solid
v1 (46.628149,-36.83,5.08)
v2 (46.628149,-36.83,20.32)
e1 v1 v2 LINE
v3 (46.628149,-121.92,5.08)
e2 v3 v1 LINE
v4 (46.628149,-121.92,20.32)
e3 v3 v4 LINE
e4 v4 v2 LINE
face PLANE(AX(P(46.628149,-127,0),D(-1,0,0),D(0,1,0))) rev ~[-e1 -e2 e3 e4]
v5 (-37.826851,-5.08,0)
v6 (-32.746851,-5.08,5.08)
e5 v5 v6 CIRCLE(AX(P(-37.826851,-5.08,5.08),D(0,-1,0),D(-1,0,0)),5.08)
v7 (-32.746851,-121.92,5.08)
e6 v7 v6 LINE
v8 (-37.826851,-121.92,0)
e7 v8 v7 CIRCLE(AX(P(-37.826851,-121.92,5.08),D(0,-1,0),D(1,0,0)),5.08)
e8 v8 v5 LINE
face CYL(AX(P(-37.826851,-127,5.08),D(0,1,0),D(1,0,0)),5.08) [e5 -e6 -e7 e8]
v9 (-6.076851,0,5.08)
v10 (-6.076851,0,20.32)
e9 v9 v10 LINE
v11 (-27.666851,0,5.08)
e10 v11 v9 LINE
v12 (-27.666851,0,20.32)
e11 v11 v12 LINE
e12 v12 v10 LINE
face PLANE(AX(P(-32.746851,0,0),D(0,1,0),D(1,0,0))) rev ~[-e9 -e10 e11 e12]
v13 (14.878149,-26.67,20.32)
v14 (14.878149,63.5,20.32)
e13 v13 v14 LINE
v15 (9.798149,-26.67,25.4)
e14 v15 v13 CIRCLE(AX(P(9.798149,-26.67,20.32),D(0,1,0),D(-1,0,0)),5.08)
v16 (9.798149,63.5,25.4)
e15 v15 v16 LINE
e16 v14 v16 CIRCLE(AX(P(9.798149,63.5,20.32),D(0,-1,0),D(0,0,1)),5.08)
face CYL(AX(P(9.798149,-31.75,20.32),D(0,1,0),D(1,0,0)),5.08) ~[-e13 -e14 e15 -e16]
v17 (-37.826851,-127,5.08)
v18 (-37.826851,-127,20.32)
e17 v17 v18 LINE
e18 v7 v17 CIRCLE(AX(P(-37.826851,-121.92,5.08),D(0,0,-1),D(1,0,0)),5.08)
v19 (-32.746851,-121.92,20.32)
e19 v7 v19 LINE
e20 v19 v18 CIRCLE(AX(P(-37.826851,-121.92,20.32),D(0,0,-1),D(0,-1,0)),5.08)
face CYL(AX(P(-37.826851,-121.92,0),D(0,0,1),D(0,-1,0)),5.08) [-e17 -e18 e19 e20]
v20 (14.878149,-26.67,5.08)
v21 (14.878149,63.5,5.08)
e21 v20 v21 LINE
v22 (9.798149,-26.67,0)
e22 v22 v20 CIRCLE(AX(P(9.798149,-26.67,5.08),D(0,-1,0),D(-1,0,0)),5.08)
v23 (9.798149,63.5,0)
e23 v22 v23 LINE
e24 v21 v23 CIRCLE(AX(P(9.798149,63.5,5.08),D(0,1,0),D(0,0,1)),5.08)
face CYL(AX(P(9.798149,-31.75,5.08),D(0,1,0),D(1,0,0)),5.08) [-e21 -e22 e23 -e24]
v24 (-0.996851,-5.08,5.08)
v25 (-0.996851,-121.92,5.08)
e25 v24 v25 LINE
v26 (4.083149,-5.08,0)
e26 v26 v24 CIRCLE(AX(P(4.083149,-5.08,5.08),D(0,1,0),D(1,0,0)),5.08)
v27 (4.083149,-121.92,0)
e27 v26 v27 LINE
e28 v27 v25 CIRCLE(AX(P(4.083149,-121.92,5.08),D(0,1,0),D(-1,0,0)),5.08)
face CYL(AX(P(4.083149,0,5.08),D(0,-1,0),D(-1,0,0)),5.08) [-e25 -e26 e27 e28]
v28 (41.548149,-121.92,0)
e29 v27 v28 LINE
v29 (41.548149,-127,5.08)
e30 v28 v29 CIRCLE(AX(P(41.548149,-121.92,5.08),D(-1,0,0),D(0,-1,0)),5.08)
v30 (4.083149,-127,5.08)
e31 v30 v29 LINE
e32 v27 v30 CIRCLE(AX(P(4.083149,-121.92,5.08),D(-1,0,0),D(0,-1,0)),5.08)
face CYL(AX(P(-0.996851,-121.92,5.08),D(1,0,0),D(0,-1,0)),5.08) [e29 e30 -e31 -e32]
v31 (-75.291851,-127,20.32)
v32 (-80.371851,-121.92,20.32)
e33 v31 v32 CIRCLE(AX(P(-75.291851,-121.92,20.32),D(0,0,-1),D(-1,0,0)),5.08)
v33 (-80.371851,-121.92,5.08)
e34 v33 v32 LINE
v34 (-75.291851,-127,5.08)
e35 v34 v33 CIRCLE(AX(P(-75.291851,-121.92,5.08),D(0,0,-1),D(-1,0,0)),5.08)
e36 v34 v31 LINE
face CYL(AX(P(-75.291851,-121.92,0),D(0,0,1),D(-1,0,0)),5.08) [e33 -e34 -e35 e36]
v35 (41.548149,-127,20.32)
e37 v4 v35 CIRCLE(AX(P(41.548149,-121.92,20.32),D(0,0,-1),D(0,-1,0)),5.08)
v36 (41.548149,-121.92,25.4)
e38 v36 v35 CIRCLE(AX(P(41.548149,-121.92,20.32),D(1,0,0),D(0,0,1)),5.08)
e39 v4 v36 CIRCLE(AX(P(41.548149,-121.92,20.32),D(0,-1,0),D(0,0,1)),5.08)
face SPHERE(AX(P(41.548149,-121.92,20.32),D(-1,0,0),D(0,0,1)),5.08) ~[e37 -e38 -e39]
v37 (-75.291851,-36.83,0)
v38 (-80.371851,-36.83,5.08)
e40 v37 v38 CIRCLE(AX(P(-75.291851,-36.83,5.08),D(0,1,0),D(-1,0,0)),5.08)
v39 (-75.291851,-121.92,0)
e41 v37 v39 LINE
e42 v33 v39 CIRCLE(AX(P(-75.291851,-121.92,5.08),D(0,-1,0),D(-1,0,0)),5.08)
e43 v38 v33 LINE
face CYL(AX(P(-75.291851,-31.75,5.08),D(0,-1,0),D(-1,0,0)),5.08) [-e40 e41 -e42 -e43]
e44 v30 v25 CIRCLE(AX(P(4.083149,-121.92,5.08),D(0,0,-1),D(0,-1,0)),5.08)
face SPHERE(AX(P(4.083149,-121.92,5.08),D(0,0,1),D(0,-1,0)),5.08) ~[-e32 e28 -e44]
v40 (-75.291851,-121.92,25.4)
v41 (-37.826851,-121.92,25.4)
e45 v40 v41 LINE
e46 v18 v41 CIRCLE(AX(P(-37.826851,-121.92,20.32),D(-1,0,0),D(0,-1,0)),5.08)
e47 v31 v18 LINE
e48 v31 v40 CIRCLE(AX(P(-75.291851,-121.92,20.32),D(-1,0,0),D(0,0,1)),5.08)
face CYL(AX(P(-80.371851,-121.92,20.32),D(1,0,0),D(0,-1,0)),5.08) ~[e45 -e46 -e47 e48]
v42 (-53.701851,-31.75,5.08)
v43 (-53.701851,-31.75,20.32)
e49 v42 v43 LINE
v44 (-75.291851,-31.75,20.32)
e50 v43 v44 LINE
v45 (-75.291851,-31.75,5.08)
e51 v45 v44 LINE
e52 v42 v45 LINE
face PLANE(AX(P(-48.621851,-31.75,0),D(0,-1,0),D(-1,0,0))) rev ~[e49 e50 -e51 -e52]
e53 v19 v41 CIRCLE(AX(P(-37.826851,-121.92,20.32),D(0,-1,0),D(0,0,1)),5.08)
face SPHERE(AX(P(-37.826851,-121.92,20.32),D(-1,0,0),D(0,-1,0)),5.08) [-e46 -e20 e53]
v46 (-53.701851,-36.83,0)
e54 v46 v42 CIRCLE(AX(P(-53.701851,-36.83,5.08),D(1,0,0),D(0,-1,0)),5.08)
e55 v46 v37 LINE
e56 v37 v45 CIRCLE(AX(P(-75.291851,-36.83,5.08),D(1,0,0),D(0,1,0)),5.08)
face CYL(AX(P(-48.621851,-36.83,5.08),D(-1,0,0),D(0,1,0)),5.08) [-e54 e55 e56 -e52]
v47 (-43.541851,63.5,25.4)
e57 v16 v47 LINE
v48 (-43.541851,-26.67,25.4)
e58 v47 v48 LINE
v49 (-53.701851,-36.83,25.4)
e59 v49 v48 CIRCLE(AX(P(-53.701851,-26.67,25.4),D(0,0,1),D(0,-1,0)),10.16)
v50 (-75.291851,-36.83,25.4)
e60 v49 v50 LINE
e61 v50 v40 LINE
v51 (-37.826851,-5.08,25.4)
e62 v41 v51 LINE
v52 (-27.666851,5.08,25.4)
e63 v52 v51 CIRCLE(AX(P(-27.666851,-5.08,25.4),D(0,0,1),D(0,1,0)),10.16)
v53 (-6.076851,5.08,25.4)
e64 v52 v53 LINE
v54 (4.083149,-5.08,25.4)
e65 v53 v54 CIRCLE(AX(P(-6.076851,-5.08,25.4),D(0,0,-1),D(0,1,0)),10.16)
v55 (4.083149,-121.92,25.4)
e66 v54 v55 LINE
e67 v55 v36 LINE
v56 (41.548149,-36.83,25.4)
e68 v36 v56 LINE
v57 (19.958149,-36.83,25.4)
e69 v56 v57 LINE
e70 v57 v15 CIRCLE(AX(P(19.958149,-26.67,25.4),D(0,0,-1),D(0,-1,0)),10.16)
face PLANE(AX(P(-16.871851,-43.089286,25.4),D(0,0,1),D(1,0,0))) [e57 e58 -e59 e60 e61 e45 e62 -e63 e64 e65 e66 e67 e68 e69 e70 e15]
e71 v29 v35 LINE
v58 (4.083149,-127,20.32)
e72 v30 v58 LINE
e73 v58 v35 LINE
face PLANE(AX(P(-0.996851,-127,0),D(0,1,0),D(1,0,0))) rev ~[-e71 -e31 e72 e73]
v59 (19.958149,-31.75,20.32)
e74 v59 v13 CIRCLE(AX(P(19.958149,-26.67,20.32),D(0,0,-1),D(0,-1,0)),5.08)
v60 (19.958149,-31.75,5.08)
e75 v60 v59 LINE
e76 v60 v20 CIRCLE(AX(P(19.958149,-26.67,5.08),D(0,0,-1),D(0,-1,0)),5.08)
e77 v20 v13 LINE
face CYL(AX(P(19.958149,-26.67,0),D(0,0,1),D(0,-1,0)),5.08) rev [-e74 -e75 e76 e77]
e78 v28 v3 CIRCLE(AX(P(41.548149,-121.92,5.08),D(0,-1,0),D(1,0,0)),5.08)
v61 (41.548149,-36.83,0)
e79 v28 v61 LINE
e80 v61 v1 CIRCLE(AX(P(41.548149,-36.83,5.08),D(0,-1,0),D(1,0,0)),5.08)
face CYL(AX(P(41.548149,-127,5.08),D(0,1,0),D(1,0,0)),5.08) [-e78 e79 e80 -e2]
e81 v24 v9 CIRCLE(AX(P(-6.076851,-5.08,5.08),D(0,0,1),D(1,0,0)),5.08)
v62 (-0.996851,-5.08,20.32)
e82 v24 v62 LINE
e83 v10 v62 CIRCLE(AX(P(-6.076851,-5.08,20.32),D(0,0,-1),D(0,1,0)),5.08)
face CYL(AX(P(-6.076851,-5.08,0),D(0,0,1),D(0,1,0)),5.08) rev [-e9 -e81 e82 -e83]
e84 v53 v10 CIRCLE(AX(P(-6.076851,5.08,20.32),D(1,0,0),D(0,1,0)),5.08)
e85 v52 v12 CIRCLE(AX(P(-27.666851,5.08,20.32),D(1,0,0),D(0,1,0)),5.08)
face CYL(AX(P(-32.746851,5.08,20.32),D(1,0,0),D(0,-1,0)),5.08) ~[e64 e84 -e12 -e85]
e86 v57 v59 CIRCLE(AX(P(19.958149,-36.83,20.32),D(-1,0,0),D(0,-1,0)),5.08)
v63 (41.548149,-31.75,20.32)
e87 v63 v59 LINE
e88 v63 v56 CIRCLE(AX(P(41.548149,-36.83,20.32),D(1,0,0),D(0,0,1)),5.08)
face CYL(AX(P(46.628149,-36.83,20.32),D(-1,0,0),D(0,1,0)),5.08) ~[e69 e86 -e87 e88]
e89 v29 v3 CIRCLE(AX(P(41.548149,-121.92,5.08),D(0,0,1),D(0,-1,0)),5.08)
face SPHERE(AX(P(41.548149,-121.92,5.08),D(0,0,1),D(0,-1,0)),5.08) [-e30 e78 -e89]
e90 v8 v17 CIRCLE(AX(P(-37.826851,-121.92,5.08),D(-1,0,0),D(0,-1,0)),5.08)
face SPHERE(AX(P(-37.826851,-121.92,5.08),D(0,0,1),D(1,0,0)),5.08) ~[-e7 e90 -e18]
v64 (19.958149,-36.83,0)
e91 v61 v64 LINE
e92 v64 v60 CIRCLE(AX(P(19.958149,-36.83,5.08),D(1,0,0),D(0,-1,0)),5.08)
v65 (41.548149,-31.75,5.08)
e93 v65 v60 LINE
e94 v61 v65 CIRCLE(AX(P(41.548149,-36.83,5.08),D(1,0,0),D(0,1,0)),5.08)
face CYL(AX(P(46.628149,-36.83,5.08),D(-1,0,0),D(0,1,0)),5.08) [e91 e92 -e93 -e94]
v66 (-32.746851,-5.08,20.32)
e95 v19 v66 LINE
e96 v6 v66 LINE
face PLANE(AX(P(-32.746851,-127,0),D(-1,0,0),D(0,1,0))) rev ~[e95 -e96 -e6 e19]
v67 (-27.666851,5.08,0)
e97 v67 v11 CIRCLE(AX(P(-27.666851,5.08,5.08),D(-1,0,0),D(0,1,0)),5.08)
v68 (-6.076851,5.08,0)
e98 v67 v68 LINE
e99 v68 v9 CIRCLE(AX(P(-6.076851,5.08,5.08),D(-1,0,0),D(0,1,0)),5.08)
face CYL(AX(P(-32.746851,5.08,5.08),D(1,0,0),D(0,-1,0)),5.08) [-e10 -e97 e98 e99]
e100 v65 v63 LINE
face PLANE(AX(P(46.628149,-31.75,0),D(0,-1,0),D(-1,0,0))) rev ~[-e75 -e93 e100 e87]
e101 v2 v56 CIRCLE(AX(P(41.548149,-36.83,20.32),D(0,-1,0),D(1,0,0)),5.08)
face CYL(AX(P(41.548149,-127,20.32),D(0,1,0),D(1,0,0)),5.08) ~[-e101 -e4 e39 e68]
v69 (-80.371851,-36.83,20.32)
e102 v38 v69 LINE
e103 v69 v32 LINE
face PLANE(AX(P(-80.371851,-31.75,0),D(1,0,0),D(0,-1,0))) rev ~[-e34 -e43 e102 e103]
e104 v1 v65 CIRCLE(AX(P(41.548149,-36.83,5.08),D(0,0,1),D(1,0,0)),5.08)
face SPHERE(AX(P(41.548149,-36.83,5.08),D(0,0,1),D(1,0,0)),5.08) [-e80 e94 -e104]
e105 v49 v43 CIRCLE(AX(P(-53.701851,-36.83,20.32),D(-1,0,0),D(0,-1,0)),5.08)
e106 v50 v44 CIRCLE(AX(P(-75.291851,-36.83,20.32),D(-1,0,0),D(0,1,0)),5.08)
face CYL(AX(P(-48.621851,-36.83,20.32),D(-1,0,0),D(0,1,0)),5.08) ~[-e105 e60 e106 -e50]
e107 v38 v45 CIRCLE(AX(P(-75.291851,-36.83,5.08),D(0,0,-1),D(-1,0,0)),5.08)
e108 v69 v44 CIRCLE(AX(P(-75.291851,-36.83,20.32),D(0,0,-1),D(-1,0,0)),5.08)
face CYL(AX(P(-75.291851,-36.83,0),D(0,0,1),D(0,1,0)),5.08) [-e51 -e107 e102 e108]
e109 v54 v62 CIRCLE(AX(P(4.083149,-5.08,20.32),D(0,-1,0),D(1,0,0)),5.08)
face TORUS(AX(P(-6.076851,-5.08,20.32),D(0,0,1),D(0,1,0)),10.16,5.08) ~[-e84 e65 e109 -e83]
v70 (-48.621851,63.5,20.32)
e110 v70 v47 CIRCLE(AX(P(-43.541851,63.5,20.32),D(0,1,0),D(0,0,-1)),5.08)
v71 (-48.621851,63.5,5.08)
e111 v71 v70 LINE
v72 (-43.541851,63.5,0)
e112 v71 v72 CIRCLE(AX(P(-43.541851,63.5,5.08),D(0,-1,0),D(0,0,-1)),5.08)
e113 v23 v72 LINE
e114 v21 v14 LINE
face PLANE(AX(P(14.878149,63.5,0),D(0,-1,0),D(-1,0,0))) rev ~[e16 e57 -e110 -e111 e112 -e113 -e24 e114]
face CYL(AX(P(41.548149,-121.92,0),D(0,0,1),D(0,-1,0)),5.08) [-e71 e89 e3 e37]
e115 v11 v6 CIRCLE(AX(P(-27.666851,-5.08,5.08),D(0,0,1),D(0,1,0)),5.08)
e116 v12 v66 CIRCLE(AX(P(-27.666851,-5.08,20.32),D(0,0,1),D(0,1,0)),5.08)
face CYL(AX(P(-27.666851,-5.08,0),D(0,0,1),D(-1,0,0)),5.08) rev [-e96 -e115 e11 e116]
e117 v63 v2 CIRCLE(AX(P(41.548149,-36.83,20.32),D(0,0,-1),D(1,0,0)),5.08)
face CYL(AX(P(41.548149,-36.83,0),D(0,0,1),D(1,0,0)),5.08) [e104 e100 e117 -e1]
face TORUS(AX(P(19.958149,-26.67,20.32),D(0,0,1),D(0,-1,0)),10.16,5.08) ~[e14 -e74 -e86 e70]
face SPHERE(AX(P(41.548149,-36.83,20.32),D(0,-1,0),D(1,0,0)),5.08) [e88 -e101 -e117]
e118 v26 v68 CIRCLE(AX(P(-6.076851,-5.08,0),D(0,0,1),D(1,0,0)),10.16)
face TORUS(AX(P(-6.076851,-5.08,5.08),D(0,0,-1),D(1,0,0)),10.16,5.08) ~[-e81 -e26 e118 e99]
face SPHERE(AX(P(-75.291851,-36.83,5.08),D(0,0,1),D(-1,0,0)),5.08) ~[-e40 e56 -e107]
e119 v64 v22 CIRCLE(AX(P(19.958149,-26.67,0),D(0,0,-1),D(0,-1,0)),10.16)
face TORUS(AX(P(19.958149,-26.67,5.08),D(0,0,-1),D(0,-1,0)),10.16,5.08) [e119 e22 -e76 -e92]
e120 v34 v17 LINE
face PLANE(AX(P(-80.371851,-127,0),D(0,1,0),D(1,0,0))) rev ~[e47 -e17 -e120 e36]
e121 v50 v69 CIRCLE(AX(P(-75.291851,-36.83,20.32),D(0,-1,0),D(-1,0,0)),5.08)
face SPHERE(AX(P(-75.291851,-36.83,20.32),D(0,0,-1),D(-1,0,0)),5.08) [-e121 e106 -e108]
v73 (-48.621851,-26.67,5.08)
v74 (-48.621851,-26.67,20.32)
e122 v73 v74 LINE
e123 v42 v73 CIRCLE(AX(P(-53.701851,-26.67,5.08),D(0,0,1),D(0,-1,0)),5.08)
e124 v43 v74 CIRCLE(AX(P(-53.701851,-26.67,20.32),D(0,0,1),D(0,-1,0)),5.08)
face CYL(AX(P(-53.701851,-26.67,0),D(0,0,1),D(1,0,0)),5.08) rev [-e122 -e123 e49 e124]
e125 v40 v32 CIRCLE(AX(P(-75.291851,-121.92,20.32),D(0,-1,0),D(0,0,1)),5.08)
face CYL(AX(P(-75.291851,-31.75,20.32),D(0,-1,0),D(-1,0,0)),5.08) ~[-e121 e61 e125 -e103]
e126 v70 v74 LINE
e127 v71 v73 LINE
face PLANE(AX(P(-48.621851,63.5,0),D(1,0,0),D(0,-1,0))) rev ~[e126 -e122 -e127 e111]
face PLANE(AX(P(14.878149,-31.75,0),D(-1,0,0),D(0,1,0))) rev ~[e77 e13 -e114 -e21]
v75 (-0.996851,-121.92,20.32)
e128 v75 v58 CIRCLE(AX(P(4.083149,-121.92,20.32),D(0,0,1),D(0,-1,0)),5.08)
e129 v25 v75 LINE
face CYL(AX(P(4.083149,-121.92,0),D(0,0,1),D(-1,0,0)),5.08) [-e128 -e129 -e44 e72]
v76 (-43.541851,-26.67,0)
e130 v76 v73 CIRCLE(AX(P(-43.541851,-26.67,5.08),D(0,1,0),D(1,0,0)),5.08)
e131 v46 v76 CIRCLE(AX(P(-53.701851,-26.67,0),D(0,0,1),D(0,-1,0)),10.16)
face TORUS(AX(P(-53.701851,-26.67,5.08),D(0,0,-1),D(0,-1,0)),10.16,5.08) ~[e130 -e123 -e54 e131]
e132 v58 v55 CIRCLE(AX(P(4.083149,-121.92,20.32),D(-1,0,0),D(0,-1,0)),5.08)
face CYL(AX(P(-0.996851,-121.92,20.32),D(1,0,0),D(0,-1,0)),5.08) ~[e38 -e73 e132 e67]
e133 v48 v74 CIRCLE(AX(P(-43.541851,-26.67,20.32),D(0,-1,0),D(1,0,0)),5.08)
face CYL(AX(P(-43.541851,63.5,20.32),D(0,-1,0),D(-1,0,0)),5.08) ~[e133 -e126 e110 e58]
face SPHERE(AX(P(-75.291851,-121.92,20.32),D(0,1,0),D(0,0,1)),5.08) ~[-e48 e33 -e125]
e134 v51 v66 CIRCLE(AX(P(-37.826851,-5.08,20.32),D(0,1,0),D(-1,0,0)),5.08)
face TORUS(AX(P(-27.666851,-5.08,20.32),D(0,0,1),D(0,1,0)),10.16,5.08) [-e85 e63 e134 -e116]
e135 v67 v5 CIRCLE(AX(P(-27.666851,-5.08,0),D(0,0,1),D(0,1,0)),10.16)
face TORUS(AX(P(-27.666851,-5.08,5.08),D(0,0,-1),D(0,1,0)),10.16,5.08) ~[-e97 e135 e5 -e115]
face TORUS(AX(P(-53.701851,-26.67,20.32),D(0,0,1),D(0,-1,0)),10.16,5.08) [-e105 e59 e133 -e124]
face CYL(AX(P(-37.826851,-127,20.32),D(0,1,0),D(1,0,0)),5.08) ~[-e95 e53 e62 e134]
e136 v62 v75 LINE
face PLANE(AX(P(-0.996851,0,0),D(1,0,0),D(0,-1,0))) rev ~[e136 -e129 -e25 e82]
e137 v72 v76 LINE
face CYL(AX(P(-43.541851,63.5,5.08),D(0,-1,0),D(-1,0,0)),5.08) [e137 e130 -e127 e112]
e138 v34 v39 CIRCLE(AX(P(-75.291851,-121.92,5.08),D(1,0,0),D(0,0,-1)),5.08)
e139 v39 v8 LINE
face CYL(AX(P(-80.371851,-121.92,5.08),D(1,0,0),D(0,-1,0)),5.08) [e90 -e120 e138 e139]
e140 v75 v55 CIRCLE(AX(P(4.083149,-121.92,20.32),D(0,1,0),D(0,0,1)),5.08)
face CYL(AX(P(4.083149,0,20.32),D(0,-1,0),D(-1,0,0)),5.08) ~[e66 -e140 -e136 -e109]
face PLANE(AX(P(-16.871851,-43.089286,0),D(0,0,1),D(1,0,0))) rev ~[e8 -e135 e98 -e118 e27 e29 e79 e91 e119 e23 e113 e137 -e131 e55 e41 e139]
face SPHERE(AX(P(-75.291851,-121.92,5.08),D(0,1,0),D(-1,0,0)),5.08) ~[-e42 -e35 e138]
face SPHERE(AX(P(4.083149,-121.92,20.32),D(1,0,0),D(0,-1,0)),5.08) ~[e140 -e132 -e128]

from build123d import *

# Parameters (mm, degrees)
F1_DEPTH = 25.4
F2_R     = 5.08


with BuildPart() as f1:
    # F0 (on Top) → F1 (new body)
    with BuildSketch(Plane.XY):
        Polygon((14.8781485382, 63.5), (-48.6218514618, 63.5), (-48.6218514618, -31.75), (-80.3718514618, -31.75), (-80.3718514618, -127), (-32.7468514618, -127), (-32.7468514618, 0), (-0.9968514618, 0), (-0.9968514618, -127), (46.6281485382, -127), (46.6281485382, -31.75), (14.8781485382, -31.75), align=None)
    extrude(amount=F1_DEPTH)

    # F2
    f2_edges = [f1.edges().sort_by_distance(p)[0] for p in [
        (14.878149, 15.875, 25.4),
        (-48.621851, 15.875, 25.4),
        (-48.621851, 15.875, 0),
        (14.878149, 15.875, 0),
        (14.878149, -31.75, 12.7),
        (-48.621851, -31.75, 12.7),
        (-80.371851, -31.75, 12.7),
        (-80.371851, -79.375, 25.4),
        (-80.371851, -79.375, 0),
        (-56.559351, -127, 25.4),
        (-80.371851, -127, 12.7),
        (22.815649, -127, 25.4),
        (46.628149, -79.375, 25.4),
        (-0.996851, -127, 12.7),
        (46.628149, -127, 12.7),
        (22.815649, -127, 0),
        (-32.746851, -127, 12.7),
        (-16.871851, 0, 25.4),
        (-32.746851, -63.5, 25.4),
        (-0.996851, -63.5, 25.4),
        (46.628149, -31.75, 12.7),
        (-0.996851, -63.5, 0),
        (-16.871851, 0, 0),
        (46.628149, -79.375, 0),
        (-32.746851, -63.5, 0),
        (-0.996851, 0, 12.7),
        (-32.746851, 0, 12.7),
        (-56.559351, -127, 0),
        (-64.496851, -31.75, 0),
        (-64.496851, -31.75, 25.4),
        (30.753149, -31.75, 0),
        (30.753149, -31.75, 25.4),
    ]]
    fillet(f2_edges, radius=F2_R)


solid = f1.part
